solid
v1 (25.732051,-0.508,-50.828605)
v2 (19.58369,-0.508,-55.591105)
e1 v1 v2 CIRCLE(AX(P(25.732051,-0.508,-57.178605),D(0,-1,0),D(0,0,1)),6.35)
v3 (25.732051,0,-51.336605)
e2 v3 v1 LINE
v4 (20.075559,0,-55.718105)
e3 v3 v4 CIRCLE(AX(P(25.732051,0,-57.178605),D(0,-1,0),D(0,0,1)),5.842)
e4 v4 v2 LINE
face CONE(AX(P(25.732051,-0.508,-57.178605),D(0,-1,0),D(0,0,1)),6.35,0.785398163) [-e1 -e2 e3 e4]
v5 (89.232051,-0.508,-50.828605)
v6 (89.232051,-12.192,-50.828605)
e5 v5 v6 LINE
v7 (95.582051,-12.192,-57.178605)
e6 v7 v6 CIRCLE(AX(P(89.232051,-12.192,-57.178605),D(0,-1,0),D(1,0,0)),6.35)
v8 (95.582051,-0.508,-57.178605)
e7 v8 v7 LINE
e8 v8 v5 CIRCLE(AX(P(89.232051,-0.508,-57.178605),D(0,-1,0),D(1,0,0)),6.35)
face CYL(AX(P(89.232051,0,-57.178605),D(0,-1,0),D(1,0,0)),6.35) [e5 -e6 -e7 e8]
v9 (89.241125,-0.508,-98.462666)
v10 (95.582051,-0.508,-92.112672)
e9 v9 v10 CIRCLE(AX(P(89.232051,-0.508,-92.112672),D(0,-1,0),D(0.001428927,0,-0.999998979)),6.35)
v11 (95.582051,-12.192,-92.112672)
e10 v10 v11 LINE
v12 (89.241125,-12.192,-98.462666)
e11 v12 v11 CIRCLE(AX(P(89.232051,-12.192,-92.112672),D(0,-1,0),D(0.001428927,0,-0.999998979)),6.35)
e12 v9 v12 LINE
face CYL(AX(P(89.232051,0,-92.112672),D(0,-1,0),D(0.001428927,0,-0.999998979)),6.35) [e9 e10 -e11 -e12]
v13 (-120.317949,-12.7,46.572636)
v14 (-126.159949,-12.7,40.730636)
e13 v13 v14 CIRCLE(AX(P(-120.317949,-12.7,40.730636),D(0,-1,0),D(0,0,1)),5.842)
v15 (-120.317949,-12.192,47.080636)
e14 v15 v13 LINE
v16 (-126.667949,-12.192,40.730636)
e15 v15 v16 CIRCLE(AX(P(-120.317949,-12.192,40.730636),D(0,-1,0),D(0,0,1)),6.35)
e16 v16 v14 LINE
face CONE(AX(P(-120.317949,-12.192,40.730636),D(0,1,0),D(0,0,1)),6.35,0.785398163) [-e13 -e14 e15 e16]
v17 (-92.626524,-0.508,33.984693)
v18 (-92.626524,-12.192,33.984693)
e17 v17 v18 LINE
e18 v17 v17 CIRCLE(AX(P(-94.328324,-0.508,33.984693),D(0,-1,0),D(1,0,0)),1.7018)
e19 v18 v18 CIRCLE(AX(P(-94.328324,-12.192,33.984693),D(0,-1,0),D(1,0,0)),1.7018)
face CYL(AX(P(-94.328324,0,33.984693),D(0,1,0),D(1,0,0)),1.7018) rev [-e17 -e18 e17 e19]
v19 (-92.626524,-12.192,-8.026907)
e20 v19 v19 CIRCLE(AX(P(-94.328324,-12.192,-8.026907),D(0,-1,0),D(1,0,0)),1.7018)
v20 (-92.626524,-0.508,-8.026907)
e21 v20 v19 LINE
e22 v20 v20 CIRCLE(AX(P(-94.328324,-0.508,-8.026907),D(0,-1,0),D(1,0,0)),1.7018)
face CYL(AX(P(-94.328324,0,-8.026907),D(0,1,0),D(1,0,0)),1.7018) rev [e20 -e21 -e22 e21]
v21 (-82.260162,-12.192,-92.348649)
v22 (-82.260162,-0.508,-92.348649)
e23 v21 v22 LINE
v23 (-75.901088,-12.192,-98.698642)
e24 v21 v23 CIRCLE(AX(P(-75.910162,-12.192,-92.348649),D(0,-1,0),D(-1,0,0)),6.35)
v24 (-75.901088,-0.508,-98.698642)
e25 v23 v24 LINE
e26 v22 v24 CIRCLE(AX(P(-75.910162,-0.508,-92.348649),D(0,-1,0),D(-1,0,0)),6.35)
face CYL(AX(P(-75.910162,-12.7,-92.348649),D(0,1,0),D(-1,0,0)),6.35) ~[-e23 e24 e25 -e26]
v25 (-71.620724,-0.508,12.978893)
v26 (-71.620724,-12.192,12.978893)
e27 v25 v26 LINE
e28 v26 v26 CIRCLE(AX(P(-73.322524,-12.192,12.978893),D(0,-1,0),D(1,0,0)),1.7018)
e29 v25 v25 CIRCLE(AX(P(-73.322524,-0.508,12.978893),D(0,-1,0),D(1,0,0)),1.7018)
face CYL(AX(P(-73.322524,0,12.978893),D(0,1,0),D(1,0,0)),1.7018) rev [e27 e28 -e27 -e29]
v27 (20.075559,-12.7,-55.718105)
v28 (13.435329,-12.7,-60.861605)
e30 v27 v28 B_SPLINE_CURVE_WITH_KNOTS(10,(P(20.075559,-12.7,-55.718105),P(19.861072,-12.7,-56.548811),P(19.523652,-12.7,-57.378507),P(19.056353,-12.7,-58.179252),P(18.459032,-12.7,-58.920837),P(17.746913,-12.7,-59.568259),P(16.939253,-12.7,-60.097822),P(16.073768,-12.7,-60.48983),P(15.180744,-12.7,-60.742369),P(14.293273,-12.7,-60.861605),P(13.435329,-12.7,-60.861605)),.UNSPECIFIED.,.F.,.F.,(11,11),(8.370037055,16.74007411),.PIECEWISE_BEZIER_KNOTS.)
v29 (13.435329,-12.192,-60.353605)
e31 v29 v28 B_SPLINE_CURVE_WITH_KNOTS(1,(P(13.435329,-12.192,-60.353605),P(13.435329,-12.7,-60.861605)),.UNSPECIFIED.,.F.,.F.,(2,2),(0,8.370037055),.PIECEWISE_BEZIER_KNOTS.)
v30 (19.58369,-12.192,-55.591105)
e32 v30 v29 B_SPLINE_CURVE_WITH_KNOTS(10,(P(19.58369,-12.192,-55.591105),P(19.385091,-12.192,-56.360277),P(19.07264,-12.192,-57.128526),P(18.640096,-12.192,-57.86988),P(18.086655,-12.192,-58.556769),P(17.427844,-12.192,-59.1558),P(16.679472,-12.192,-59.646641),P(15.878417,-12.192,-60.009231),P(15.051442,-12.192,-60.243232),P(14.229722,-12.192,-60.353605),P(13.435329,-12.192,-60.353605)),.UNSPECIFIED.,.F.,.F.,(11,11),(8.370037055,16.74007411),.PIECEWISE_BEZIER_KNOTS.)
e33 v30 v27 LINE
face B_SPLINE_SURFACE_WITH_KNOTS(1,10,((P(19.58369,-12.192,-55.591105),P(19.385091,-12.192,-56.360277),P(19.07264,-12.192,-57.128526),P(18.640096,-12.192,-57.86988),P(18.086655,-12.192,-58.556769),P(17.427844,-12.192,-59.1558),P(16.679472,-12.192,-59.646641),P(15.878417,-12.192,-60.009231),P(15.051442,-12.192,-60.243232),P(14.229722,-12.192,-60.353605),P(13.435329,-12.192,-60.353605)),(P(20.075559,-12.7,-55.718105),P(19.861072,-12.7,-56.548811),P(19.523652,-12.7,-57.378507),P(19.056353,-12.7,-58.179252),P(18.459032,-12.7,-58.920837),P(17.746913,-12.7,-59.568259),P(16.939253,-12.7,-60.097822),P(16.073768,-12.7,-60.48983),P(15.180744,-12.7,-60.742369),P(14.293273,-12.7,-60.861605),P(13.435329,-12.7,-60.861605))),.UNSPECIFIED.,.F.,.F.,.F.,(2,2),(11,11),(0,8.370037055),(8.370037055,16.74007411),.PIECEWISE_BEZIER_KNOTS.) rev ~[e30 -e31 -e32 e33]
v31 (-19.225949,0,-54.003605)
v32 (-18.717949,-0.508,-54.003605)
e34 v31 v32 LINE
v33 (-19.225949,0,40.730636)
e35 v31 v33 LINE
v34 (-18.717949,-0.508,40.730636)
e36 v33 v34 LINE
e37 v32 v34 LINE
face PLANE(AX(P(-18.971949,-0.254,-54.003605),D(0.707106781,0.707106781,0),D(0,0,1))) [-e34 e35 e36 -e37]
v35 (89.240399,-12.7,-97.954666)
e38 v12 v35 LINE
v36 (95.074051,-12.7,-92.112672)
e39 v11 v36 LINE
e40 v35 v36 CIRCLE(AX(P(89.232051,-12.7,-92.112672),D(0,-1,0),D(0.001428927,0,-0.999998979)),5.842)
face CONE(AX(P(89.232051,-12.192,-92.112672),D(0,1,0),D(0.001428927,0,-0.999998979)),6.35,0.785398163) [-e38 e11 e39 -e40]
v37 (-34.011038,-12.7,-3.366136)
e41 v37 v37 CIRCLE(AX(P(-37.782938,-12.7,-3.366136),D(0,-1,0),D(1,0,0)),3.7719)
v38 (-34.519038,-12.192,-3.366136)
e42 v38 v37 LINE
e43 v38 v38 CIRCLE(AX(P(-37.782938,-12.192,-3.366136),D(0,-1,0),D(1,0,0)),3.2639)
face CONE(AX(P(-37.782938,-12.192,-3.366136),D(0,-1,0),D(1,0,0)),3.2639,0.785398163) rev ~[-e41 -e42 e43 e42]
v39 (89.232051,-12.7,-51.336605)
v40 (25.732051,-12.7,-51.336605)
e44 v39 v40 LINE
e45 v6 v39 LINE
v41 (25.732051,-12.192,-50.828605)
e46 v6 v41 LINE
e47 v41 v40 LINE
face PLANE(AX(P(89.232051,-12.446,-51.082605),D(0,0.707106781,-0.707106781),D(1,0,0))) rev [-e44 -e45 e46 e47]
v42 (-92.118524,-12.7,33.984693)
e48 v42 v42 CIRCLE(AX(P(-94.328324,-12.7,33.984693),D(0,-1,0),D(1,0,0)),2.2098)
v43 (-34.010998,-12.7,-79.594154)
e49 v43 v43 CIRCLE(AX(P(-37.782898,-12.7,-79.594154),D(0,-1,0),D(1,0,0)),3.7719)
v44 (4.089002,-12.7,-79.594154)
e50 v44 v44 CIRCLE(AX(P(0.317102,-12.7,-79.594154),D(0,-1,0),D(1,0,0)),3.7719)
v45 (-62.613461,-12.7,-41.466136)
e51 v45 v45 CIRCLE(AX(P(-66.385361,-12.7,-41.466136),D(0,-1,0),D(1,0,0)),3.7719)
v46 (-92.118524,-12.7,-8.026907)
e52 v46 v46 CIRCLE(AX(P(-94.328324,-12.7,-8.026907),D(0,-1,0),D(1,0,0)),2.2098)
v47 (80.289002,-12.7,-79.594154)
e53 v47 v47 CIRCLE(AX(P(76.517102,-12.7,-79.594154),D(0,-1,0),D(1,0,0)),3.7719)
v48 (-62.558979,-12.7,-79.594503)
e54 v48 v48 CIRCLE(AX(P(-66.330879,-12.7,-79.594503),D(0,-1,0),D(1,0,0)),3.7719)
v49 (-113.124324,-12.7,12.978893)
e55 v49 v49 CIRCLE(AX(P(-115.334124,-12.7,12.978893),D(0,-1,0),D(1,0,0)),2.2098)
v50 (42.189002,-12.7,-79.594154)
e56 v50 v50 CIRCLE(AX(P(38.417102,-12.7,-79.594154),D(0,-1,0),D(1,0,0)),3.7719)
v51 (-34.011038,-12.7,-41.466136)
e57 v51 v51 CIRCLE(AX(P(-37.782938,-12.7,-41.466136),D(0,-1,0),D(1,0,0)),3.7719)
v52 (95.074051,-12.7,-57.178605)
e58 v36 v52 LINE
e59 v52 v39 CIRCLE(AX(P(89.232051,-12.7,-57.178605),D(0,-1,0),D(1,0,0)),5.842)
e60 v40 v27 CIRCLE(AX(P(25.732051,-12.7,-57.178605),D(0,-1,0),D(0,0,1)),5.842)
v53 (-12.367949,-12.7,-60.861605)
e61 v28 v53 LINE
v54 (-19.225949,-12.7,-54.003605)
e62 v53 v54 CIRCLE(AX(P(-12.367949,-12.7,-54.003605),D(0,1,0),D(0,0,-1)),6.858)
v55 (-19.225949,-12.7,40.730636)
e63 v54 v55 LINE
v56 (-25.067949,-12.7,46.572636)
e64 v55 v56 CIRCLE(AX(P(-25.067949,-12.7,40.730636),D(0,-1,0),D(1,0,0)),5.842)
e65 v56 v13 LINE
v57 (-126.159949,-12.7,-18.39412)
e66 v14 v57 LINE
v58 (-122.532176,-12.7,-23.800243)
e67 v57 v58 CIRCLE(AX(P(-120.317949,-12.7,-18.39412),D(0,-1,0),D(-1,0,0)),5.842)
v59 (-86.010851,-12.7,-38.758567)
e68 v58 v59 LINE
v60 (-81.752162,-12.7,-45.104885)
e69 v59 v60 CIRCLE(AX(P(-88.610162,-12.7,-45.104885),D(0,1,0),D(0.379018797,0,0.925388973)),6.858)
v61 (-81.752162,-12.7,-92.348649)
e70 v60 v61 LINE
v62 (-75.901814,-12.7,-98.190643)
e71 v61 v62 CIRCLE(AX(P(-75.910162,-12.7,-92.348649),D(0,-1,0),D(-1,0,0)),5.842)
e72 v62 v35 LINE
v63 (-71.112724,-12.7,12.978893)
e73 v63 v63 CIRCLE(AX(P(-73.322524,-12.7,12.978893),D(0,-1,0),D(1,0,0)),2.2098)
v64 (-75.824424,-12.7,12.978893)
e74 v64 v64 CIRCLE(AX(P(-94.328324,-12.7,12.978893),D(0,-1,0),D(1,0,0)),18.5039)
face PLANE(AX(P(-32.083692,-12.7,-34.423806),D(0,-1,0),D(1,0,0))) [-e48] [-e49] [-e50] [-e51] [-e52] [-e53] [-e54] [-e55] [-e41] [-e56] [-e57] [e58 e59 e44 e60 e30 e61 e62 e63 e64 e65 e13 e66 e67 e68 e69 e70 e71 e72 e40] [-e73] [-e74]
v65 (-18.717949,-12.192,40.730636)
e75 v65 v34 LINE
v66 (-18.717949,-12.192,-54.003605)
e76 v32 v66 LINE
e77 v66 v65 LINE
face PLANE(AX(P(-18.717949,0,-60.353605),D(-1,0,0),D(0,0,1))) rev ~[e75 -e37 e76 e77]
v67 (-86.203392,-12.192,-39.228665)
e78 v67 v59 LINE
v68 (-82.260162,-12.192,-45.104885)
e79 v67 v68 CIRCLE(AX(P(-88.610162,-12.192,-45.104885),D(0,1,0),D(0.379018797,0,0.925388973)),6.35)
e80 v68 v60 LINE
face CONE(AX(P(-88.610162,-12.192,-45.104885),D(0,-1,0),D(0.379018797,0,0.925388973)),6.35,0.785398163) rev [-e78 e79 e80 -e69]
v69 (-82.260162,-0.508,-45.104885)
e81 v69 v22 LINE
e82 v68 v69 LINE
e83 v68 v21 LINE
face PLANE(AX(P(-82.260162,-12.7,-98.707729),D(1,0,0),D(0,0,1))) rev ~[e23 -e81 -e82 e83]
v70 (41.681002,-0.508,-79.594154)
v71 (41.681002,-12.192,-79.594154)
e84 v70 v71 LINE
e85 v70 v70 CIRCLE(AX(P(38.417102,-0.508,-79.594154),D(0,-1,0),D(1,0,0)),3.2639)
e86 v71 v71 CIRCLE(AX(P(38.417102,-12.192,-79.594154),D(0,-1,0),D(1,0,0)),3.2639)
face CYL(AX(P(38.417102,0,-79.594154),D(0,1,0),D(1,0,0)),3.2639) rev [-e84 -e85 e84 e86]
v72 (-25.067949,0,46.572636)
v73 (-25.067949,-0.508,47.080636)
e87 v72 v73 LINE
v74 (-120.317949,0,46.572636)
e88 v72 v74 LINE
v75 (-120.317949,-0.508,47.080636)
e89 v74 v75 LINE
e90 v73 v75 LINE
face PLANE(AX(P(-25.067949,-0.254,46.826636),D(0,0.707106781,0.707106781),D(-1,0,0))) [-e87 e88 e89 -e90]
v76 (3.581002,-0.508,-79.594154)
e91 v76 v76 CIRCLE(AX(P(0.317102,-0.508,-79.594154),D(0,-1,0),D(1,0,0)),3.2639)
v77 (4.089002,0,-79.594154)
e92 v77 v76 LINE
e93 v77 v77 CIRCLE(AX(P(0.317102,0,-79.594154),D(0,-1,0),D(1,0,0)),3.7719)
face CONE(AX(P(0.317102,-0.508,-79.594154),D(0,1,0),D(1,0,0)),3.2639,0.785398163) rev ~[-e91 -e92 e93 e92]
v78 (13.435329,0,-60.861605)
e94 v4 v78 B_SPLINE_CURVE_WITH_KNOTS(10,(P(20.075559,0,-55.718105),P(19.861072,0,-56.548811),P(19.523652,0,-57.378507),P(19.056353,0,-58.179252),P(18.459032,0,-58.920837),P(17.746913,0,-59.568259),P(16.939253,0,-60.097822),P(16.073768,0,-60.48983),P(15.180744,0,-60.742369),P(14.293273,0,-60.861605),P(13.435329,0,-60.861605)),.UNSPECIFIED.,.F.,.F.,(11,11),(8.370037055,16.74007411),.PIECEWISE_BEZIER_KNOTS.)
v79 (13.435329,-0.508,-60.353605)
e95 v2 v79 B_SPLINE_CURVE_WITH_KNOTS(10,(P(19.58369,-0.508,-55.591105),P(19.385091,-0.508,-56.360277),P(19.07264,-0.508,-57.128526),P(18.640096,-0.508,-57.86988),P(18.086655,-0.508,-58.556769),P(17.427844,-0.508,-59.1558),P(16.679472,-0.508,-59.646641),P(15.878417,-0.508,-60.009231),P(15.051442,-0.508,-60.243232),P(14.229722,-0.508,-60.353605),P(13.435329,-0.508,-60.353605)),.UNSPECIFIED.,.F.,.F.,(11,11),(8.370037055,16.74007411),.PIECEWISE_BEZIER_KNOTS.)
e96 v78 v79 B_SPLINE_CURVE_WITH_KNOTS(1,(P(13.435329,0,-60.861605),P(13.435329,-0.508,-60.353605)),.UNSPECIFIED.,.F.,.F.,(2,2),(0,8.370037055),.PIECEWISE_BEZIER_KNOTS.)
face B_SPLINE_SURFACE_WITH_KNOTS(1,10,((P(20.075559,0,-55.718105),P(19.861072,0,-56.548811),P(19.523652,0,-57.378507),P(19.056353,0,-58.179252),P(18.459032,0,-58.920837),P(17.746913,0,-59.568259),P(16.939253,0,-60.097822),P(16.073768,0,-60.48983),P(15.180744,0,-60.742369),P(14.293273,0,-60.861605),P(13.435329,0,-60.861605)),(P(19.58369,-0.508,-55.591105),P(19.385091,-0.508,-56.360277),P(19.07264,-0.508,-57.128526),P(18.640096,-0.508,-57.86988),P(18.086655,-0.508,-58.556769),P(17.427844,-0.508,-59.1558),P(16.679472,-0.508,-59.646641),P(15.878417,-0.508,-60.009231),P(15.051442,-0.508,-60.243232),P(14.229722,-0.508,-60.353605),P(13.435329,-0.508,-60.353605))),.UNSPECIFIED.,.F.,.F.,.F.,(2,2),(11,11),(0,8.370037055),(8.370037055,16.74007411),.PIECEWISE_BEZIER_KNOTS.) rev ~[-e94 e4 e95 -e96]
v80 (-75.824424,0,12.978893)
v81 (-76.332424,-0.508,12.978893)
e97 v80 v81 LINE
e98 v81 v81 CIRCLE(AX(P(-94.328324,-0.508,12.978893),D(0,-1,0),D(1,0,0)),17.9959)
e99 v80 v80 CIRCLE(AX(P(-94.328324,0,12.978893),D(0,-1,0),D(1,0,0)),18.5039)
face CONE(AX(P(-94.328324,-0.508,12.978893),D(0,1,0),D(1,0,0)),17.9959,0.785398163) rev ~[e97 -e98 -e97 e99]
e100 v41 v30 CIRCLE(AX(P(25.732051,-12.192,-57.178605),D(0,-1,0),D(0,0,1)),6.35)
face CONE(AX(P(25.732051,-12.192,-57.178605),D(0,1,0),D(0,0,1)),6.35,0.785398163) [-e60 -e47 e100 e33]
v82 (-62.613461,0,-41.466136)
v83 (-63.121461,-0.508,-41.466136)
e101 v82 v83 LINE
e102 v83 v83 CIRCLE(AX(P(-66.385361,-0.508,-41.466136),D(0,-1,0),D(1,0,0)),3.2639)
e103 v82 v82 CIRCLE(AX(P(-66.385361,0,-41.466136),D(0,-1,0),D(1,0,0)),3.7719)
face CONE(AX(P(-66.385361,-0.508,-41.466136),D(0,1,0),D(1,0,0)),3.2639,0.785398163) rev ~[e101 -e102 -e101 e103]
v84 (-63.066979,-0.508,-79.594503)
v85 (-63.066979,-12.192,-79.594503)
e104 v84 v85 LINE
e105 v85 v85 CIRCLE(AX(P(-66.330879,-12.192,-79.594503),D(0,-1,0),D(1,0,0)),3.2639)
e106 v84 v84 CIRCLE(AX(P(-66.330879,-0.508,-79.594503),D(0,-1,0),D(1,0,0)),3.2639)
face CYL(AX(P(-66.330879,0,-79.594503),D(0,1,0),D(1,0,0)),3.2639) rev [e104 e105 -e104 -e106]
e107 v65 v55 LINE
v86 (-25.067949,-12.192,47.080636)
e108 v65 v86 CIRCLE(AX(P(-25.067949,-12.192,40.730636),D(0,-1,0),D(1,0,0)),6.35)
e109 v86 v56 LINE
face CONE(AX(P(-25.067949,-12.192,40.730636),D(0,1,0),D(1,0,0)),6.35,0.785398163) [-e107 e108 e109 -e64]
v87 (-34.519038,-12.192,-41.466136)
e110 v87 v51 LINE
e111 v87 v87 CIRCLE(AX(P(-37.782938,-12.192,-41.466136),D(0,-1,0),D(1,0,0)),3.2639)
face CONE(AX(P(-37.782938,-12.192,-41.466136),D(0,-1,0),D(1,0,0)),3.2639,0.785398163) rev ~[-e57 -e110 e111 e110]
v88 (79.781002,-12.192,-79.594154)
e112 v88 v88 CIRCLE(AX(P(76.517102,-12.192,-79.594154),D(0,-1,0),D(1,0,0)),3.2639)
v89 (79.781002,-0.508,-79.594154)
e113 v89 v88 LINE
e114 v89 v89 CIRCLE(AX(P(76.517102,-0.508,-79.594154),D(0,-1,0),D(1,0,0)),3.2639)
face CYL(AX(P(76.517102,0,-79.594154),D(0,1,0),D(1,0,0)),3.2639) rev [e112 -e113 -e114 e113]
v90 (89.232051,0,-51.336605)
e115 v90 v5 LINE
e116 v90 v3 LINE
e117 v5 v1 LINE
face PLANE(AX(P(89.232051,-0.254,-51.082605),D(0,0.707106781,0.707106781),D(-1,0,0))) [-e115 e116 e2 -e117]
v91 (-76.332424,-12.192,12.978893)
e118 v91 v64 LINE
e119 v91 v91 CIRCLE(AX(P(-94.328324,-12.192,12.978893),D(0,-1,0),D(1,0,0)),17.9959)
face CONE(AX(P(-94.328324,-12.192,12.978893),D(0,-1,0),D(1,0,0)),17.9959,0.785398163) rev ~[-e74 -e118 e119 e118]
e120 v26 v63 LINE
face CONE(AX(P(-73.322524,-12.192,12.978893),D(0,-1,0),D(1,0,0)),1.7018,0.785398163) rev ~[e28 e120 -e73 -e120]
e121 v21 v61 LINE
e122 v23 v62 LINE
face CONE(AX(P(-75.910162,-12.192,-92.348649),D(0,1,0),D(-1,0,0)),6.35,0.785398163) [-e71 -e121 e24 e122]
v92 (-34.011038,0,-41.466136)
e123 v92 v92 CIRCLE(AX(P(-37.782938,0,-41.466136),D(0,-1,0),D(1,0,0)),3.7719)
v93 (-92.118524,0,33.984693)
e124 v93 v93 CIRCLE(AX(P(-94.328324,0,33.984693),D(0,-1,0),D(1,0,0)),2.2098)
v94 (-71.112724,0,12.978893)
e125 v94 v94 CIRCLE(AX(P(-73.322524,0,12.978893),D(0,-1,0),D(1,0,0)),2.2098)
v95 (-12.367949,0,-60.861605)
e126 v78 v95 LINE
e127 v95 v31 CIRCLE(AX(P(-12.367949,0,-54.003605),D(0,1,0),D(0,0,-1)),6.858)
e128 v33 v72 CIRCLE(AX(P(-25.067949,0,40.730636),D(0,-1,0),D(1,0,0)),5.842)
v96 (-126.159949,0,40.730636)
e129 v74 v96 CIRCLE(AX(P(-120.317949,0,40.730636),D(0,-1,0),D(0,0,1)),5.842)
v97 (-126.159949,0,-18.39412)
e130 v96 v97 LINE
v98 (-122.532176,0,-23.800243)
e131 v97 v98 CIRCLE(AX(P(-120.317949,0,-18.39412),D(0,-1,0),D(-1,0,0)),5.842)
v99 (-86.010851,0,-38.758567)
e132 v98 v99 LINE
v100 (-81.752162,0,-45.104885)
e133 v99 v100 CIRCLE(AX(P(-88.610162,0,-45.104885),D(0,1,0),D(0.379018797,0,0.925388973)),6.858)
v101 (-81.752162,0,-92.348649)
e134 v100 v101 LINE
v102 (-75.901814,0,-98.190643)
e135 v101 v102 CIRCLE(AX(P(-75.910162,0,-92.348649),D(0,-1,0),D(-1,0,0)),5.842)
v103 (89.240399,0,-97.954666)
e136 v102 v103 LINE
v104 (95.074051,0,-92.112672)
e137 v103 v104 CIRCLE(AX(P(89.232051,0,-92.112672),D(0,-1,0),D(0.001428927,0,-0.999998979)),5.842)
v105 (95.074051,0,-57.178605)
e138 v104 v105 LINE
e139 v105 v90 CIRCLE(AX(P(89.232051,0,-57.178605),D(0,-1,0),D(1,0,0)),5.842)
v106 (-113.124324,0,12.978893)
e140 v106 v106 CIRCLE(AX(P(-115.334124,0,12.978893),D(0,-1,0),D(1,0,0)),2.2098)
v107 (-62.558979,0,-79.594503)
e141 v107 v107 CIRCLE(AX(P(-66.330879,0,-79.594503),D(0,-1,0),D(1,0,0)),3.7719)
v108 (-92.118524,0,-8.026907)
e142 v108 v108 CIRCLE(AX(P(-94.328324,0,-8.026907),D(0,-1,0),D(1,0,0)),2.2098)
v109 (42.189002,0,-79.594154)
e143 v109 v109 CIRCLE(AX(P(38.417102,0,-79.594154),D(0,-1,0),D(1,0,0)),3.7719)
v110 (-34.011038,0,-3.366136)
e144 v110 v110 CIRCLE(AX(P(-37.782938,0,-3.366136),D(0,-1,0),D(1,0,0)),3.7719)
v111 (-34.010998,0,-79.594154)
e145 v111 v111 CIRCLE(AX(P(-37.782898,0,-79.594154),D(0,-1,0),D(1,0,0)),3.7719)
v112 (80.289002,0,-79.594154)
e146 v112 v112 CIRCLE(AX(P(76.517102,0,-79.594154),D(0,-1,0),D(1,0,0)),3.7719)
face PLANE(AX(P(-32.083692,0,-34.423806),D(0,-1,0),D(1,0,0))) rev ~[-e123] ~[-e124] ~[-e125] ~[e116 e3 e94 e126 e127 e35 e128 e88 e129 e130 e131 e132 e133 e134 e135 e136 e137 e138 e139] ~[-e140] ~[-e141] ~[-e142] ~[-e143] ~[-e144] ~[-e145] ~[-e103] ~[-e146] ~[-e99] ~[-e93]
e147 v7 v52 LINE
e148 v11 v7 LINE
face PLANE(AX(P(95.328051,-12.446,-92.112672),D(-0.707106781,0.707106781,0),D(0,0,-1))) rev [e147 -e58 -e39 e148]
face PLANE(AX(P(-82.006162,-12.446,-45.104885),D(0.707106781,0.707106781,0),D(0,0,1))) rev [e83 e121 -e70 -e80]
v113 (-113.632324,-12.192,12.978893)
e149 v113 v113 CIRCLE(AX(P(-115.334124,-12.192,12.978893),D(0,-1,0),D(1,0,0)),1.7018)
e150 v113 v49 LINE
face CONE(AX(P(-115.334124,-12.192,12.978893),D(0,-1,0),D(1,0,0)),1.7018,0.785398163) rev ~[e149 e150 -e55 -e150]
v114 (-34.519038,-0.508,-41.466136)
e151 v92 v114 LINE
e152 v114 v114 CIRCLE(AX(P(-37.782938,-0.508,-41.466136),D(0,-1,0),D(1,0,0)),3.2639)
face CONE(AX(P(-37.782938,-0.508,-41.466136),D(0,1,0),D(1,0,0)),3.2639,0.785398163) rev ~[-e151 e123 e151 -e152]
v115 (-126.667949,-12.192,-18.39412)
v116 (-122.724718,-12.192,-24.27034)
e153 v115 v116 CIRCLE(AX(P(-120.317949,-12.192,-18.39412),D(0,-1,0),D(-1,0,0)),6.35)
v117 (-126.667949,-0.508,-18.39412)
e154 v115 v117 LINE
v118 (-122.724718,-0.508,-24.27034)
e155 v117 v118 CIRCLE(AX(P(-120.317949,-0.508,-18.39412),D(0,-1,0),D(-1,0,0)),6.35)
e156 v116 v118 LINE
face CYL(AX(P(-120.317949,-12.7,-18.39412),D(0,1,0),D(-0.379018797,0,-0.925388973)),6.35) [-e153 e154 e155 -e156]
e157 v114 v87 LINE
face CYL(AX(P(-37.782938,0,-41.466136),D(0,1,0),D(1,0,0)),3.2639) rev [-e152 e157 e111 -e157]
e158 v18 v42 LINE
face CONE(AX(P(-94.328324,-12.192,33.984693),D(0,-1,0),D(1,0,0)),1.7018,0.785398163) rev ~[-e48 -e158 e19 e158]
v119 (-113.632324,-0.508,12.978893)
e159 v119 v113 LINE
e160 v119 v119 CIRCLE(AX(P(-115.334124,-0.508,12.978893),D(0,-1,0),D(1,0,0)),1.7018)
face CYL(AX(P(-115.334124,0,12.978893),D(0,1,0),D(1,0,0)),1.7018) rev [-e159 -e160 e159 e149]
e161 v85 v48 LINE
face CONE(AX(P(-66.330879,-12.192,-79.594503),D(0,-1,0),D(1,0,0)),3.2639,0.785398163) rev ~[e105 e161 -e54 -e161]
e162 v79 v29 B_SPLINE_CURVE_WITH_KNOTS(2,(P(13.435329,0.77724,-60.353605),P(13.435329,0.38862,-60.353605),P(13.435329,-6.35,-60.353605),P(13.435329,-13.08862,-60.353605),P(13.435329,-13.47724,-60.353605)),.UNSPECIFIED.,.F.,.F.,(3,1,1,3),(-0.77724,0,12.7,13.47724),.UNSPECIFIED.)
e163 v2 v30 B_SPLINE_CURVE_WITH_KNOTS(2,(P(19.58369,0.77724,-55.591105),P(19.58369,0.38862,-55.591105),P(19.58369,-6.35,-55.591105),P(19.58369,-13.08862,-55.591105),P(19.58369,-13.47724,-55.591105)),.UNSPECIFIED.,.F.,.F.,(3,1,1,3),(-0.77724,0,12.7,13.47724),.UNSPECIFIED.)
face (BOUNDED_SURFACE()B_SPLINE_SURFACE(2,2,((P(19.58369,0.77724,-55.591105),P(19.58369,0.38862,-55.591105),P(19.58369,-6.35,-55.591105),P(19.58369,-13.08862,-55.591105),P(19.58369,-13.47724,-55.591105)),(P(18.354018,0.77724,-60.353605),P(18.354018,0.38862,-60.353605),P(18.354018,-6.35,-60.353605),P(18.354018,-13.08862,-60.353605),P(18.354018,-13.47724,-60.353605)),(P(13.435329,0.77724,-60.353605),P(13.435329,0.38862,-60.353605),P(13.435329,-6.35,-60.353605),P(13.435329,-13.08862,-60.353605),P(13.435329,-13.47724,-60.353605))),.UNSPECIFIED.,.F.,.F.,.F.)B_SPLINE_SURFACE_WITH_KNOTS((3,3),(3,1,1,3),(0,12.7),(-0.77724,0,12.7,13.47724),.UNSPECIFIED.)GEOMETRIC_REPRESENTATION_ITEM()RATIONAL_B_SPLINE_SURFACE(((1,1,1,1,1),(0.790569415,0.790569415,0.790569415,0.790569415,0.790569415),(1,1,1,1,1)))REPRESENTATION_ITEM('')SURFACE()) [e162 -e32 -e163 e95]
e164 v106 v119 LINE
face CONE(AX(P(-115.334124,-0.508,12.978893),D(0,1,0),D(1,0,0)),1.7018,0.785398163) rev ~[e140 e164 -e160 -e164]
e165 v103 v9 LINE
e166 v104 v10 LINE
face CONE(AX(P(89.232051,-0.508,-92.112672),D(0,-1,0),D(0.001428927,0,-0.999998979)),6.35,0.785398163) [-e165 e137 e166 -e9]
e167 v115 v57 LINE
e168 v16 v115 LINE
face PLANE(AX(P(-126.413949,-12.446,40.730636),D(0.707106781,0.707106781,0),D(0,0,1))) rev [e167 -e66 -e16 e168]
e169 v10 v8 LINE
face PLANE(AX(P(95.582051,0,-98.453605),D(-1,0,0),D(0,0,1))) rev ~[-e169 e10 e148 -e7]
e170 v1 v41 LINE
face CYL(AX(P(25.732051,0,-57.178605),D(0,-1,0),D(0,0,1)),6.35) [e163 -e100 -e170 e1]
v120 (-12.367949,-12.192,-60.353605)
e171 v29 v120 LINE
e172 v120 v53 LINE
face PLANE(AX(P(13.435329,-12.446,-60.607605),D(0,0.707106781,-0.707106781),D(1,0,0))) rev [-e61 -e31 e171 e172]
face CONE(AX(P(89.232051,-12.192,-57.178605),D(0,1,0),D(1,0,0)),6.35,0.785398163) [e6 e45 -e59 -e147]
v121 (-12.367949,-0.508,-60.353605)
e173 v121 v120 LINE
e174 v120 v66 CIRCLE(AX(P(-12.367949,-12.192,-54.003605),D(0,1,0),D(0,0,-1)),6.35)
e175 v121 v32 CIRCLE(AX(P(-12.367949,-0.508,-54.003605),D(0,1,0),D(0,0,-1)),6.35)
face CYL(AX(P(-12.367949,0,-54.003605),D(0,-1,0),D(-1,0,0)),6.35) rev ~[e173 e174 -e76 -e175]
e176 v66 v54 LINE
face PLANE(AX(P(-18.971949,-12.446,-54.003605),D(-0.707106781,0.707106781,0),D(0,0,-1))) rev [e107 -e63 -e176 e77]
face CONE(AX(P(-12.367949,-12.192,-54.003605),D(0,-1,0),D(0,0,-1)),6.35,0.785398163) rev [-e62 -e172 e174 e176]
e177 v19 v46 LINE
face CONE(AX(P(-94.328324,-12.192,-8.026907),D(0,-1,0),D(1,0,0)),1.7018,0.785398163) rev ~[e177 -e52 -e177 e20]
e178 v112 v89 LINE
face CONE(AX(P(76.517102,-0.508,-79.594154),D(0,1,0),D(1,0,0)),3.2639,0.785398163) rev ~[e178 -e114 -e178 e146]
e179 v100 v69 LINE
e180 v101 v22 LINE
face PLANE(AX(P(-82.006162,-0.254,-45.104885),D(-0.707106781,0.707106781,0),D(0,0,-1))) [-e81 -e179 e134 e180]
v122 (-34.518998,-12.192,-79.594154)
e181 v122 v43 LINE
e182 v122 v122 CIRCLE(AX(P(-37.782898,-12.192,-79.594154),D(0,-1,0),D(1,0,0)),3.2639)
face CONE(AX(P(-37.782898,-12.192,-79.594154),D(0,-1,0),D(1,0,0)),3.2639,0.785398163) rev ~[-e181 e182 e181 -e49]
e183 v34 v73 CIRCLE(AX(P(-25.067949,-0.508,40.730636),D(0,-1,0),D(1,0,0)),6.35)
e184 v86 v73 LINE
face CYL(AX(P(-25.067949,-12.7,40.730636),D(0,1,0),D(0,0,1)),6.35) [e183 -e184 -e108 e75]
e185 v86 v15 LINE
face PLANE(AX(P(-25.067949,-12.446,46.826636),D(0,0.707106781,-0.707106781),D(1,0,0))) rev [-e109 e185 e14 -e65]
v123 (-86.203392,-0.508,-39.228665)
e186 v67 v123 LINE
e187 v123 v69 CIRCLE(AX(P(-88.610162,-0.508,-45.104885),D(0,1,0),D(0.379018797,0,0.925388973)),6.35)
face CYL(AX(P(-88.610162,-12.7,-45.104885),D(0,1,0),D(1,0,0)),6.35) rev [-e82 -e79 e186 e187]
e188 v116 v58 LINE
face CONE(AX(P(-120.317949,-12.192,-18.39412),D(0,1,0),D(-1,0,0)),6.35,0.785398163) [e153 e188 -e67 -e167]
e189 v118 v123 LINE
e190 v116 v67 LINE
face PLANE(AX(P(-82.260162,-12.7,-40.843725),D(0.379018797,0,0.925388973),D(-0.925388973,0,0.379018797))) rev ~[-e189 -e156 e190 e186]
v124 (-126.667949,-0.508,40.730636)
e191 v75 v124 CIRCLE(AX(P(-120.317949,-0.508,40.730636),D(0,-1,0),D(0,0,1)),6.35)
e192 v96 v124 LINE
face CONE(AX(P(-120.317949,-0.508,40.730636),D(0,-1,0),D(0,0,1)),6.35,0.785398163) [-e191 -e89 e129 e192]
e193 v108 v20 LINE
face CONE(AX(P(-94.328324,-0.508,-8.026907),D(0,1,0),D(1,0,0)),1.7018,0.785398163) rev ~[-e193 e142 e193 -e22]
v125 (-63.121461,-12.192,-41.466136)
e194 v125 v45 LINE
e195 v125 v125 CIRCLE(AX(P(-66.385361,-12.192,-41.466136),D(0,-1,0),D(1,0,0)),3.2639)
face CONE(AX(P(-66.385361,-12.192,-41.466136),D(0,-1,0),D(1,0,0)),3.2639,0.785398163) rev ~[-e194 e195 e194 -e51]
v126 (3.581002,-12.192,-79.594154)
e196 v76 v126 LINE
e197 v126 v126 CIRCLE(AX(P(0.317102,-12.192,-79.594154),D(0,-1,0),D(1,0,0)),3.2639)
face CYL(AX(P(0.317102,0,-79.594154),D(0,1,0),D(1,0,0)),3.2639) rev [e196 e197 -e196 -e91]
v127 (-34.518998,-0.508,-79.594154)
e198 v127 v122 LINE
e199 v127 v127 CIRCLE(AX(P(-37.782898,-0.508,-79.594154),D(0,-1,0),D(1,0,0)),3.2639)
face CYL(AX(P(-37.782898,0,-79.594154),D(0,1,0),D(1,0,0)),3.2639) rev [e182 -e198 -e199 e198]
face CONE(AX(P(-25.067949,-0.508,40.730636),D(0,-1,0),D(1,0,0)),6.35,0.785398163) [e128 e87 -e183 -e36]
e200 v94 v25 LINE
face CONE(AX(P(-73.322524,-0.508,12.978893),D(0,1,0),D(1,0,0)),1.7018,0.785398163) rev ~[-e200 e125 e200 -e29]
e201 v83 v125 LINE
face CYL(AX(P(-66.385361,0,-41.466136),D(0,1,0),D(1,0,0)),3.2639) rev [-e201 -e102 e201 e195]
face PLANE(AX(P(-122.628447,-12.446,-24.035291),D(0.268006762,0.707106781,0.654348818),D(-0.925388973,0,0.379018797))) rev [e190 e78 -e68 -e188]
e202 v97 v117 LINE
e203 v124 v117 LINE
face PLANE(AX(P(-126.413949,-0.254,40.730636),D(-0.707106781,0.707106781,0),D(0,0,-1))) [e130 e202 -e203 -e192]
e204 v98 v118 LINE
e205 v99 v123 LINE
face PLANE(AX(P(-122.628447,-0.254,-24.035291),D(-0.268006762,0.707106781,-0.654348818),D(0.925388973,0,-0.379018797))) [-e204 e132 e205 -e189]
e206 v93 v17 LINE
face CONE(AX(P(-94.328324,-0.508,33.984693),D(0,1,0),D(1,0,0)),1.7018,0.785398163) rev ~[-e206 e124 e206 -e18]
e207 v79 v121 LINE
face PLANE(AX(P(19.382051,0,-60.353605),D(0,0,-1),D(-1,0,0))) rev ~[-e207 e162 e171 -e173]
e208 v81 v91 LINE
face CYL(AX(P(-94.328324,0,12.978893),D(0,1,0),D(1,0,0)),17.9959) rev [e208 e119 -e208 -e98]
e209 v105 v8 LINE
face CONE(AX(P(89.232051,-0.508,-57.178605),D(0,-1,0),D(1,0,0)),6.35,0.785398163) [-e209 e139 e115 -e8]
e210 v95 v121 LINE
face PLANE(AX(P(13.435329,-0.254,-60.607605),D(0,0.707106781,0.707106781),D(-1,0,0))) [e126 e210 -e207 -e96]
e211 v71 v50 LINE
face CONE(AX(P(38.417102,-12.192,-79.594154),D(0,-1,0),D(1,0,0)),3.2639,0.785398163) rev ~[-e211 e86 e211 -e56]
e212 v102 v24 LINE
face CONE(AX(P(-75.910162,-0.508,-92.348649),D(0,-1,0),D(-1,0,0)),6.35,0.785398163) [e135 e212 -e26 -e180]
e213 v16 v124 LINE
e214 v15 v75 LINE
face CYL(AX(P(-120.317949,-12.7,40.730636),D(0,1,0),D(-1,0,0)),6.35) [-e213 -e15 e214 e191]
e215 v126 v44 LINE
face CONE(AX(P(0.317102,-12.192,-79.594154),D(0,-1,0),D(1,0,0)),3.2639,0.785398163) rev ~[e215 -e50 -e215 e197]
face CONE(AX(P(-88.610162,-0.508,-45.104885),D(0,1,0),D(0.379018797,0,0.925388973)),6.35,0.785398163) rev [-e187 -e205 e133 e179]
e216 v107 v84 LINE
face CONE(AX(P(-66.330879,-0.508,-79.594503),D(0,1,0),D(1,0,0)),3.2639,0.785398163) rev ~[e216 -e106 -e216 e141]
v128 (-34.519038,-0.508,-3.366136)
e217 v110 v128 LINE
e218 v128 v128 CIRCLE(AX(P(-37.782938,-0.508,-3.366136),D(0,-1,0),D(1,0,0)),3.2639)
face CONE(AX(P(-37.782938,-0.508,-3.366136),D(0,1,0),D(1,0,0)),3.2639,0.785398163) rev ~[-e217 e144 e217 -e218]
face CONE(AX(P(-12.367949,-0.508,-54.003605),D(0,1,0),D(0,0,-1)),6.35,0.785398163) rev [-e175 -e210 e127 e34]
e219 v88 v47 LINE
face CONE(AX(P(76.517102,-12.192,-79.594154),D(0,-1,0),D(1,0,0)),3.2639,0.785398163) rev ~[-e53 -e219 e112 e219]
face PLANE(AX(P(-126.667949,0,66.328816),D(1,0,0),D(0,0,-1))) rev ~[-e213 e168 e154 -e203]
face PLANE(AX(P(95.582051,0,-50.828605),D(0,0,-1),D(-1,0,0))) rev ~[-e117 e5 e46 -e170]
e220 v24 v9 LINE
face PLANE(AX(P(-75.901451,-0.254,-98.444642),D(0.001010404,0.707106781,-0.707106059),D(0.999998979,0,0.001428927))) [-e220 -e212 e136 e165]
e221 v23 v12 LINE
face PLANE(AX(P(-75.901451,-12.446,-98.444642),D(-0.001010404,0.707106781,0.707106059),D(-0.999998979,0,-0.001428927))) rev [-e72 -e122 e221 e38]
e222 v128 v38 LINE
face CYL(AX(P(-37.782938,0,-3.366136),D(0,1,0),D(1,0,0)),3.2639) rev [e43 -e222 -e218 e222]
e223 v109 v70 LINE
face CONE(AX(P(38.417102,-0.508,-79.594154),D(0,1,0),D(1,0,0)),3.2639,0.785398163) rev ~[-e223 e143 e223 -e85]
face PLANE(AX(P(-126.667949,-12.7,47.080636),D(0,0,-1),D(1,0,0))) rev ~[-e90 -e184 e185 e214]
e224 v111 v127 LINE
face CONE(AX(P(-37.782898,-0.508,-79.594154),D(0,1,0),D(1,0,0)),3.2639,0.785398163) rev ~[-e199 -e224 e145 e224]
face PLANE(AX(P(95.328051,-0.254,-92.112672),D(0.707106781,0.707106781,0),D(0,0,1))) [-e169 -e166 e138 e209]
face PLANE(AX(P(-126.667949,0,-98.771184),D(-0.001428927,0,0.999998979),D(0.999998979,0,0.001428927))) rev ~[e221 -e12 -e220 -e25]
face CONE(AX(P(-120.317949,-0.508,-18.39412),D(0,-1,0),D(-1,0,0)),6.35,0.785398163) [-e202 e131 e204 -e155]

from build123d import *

# Parameters (mm, degrees)
F0_R     = 3.2639
F0_R_2   = 1.7018
F0_R_3   = 17.9959
F1_DEPTH = 12.7
F2_W     = 107.95
F2_H     = 19.2481796932
F3_DEPTH = 25.4
F4_F1_R  = 6.35
F4_F2_R  = 6.35
F5_R     = 6.35
F6_SIZE  = 0.508


with BuildPart() as f1:
    # F0 (on Front) → F1 (new body)
    with BuildSketch(Plane.XZ):
        Polygon((-126.667948618, -98.7711842824), (95.582051382, -98.4536048876), (95.582051382, -60.3536048876), (95.582051382, -50.8286048876), (19.382051382, -50.8286048876), (19.382051382, -60.3536048876), (-18.717948618, -60.3536048876), (-18.717948618, 66.3288157176), (-126.667948618, 66.3288157176), align=None)
        with Locations((-66.3308787224, -79.5945032566)):
            Circle(F0_R, mode=Mode.SUBTRACT)
        with Locations((-37.7828981478, -79.5941544378)):
            Circle(F0_R, mode=Mode.SUBTRACT)
        with Locations((-66.3853614397, -41.4661356021)):
            Circle(F0_R, mode=Mode.SUBTRACT)
        with Locations((-37.7829381848, -41.4661356021)):
            Circle(F0_R, mode=Mode.SUBTRACT)
        with Locations((0.3171018521, -79.5941544378)):
            Circle(F0_R, mode=Mode.SUBTRACT)
        with Locations((38.4171018521, -79.5941544378)):
            Circle(F0_R, mode=Mode.SUBTRACT)
        with Locations((76.5171018521, -79.5941544378)):
            Circle(F0_R, mode=Mode.SUBTRACT)
        with Locations((-117.8233242227, -10.5161073038)):
            Circle(F0_R_2, mode=Mode.SUBTRACT)
        with Locations((-94.3283242227, -8.0269073038)):
            Circle(F0_R_2, mode=Mode.SUBTRACT)
        with Locations((-115.3341242227, 12.9788926962)):
            Circle(F0_R_2, mode=Mode.SUBTRACT)
        with Locations((-94.3283242227, 12.9788926962)):
            Circle(F0_R_3, mode=Mode.SUBTRACT)
        with Locations((-73.3225242227, 12.9788926962)):
            Circle(F0_R_2, mode=Mode.SUBTRACT)
        with Locations((-70.8333242227, -10.5161073038)):
            Circle(F0_R_2, mode=Mode.SUBTRACT)
        with Locations((-37.7829381848, -3.3661356021)):
            Circle(F0_R, mode=Mode.SUBTRACT)
        with Locations((-117.8233242227, 36.4738926962)):
            Circle(F0_R_2, mode=Mode.SUBTRACT)
        with Locations((-94.3283242227, 33.9846926962)):
            Circle(F0_R_2, mode=Mode.SUBTRACT)
        with Locations((-70.8333242227, 36.4738926962)):
            Circle(F0_R_2, mode=Mode.SUBTRACT)
        with Locations((-117.8233242227, 36.4738926962)):
            Circle(F0_R_2)
        with Locations((-70.8333242227, 36.4738926962)):
            Circle(F0_R_2)
        with Locations((-70.8333242227, -10.5161073038)):
            Circle(F0_R_2)
        with Locations((-117.8233242227, -10.5161073038)):
            Circle(F0_R_2)
    extrude(amount=F1_DEPTH)

    # F2 (on face) → F3 (cut)
    with BuildSketch(Plane.XZ.offset(12.7)):
        Polygon((-82.2601616383, -40.8437248283), (-126.667948618, -22.6552803069), (-126.667948618, -98.7711842824), (-82.2601616383, -98.7077287228), align=None)
        with Locations((-72.692948618, 56.7047258711)):
            Rectangle(F2_W, F2_H)
    extrude(amount=-F3_DEPTH, mode=Mode.SUBTRACT)

    # F4: fillet of radius 6.35 on 9 edges, made by hand

    # F4_f1
    f4_f1_edges = [f1.edges().sort_by_distance(p)[0] for p in [
        (-82.2601616383, -6.35, -40.8437248283),
        (-18.717948618, -6.35, -60.3536048876),
    ]]
    fillet(f4_f1_edges, radius=F4_F1_R)

    # F4_f2
    f4_f2_edges = [f1.edges().sort_by_distance(p)[0] for p in [
        (-126.667948618, -6.35, 47.0806360245),
        (-126.667948618, -6.35, -22.6552803069),
        (-18.717948618, -6.35, 47.0806360245),
        (-82.2601616383, -6.35, -98.7077287228),
        (95.582051382, -6.35, -98.4536048876),
        (95.582051382, -6.35, -50.8286048876),
        (19.382051382, -6.35, -50.8286048876),
    ]]
    fillet(f4_f2_edges, radius=F4_F2_R)

    # F5
    f5_edges = [f1.edges().sort_by_distance(p)[0] for p in [
        (19.382051, -6.35, -60.353605),
    ]]
    fillet(f5_edges, radius=F5_R)

    # F6
    f6_edges = [f1.edges().sort_by_distance(p)[0] for p in [
        (21.843486, -12.7, -52.158489),
        (17.323894, -12.7, -59.023721),
        (57.482051, -12.7, -50.828605),
        (0.53369, -12.7, -60.353605),
        (93.722179, -12.7, -52.688477),
        (-16.858077, -12.7, -58.493733),
        (95.582051, -12.7, -74.645638),
        (-18.717949, -12.7, -6.636484),
        (93.725386, -12.7, -96.599591),
        (-20.577821, -12.7, 45.220764),
        (6.670019, -12.7, -98.580654),
        (-72.692949, -12.7, 47.080636),
        (-80.397081, -12.7, -96.841983),
        (-124.808077, -12.7, 45.220764),
        (-82.260162, -12.7, -68.726767),
        (-126.667949, -12.7, 11.168258),
        (-83.337331, -12.7, -41.566558),
        (-125.590779, -12.7, -21.932447),
        (-104.464055, -12.7, -31.749503),
        (-69.594779, -12.7, -79.594503),
        (-41.046798, -12.7, -79.594154),
        (-69.649261, -12.7, -41.466136),
        (-41.046838, -12.7, -41.466136),
        (-2.946798, -12.7, -79.594154),
        (35.153202, -12.7, -79.594154),
        (73.253202, -12.7, -79.594154),
        (-96.030124, -12.7, -8.026907),
        (-41.046838, -12.7, -3.366136),
        (-117.035924, -12.7, 12.978893),
        (-112.324224, -12.7, 12.978893),
        (-75.024324, -12.7, 12.978893),
        (-96.030124, -12.7, 33.984693),
        (21.843486, 0, -52.158489),
        (17.323894, 0, -59.023721),
        (57.482051, 0, -50.828605),
        (0.53369, 0, -60.353605),
        (93.722179, 0, -52.688477),
        (-16.858077, 0, -58.493733),
        (95.582051, 0, -74.645638),
        (-18.717949, 0, -6.636484),
        (93.725386, 0, -96.599591),
        (-20.577821, 0, 45.220764),
        (6.670019, 0, -98.580654),
        (-72.692949, 0, 47.080636),
        (-80.397081, 0, -96.841983),
        (-124.808077, 0, 45.220764),
        (-82.260162, 0, -68.726767),
        (-126.667949, 0, 11.168258),
        (-83.337331, 0, -41.566558),
        (-125.590779, 0, -21.932447),
        (-104.464055, 0, -31.749503),
        (-69.594779, 0, -79.594503),
        (-41.046798, 0, -79.594154),
        (-69.649261, 0, -41.466136),
        (-41.046838, 0, -41.466136),
        (-2.946798, 0, -79.594154),
        (35.153202, 0, -79.594154),
        (73.253202, 0, -79.594154),
        (-96.030124, 0, -8.026907),
        (-41.046838, 0, -3.366136),
        (-117.035924, 0, 12.978893),
        (-112.324224, 0, 12.978893),
        (-75.024324, 0, 12.978893),
        (-96.030124, 0, 33.984693),
    ]]
    chamfer(f6_edges, length=F6_SIZE)


solid = f1.part
